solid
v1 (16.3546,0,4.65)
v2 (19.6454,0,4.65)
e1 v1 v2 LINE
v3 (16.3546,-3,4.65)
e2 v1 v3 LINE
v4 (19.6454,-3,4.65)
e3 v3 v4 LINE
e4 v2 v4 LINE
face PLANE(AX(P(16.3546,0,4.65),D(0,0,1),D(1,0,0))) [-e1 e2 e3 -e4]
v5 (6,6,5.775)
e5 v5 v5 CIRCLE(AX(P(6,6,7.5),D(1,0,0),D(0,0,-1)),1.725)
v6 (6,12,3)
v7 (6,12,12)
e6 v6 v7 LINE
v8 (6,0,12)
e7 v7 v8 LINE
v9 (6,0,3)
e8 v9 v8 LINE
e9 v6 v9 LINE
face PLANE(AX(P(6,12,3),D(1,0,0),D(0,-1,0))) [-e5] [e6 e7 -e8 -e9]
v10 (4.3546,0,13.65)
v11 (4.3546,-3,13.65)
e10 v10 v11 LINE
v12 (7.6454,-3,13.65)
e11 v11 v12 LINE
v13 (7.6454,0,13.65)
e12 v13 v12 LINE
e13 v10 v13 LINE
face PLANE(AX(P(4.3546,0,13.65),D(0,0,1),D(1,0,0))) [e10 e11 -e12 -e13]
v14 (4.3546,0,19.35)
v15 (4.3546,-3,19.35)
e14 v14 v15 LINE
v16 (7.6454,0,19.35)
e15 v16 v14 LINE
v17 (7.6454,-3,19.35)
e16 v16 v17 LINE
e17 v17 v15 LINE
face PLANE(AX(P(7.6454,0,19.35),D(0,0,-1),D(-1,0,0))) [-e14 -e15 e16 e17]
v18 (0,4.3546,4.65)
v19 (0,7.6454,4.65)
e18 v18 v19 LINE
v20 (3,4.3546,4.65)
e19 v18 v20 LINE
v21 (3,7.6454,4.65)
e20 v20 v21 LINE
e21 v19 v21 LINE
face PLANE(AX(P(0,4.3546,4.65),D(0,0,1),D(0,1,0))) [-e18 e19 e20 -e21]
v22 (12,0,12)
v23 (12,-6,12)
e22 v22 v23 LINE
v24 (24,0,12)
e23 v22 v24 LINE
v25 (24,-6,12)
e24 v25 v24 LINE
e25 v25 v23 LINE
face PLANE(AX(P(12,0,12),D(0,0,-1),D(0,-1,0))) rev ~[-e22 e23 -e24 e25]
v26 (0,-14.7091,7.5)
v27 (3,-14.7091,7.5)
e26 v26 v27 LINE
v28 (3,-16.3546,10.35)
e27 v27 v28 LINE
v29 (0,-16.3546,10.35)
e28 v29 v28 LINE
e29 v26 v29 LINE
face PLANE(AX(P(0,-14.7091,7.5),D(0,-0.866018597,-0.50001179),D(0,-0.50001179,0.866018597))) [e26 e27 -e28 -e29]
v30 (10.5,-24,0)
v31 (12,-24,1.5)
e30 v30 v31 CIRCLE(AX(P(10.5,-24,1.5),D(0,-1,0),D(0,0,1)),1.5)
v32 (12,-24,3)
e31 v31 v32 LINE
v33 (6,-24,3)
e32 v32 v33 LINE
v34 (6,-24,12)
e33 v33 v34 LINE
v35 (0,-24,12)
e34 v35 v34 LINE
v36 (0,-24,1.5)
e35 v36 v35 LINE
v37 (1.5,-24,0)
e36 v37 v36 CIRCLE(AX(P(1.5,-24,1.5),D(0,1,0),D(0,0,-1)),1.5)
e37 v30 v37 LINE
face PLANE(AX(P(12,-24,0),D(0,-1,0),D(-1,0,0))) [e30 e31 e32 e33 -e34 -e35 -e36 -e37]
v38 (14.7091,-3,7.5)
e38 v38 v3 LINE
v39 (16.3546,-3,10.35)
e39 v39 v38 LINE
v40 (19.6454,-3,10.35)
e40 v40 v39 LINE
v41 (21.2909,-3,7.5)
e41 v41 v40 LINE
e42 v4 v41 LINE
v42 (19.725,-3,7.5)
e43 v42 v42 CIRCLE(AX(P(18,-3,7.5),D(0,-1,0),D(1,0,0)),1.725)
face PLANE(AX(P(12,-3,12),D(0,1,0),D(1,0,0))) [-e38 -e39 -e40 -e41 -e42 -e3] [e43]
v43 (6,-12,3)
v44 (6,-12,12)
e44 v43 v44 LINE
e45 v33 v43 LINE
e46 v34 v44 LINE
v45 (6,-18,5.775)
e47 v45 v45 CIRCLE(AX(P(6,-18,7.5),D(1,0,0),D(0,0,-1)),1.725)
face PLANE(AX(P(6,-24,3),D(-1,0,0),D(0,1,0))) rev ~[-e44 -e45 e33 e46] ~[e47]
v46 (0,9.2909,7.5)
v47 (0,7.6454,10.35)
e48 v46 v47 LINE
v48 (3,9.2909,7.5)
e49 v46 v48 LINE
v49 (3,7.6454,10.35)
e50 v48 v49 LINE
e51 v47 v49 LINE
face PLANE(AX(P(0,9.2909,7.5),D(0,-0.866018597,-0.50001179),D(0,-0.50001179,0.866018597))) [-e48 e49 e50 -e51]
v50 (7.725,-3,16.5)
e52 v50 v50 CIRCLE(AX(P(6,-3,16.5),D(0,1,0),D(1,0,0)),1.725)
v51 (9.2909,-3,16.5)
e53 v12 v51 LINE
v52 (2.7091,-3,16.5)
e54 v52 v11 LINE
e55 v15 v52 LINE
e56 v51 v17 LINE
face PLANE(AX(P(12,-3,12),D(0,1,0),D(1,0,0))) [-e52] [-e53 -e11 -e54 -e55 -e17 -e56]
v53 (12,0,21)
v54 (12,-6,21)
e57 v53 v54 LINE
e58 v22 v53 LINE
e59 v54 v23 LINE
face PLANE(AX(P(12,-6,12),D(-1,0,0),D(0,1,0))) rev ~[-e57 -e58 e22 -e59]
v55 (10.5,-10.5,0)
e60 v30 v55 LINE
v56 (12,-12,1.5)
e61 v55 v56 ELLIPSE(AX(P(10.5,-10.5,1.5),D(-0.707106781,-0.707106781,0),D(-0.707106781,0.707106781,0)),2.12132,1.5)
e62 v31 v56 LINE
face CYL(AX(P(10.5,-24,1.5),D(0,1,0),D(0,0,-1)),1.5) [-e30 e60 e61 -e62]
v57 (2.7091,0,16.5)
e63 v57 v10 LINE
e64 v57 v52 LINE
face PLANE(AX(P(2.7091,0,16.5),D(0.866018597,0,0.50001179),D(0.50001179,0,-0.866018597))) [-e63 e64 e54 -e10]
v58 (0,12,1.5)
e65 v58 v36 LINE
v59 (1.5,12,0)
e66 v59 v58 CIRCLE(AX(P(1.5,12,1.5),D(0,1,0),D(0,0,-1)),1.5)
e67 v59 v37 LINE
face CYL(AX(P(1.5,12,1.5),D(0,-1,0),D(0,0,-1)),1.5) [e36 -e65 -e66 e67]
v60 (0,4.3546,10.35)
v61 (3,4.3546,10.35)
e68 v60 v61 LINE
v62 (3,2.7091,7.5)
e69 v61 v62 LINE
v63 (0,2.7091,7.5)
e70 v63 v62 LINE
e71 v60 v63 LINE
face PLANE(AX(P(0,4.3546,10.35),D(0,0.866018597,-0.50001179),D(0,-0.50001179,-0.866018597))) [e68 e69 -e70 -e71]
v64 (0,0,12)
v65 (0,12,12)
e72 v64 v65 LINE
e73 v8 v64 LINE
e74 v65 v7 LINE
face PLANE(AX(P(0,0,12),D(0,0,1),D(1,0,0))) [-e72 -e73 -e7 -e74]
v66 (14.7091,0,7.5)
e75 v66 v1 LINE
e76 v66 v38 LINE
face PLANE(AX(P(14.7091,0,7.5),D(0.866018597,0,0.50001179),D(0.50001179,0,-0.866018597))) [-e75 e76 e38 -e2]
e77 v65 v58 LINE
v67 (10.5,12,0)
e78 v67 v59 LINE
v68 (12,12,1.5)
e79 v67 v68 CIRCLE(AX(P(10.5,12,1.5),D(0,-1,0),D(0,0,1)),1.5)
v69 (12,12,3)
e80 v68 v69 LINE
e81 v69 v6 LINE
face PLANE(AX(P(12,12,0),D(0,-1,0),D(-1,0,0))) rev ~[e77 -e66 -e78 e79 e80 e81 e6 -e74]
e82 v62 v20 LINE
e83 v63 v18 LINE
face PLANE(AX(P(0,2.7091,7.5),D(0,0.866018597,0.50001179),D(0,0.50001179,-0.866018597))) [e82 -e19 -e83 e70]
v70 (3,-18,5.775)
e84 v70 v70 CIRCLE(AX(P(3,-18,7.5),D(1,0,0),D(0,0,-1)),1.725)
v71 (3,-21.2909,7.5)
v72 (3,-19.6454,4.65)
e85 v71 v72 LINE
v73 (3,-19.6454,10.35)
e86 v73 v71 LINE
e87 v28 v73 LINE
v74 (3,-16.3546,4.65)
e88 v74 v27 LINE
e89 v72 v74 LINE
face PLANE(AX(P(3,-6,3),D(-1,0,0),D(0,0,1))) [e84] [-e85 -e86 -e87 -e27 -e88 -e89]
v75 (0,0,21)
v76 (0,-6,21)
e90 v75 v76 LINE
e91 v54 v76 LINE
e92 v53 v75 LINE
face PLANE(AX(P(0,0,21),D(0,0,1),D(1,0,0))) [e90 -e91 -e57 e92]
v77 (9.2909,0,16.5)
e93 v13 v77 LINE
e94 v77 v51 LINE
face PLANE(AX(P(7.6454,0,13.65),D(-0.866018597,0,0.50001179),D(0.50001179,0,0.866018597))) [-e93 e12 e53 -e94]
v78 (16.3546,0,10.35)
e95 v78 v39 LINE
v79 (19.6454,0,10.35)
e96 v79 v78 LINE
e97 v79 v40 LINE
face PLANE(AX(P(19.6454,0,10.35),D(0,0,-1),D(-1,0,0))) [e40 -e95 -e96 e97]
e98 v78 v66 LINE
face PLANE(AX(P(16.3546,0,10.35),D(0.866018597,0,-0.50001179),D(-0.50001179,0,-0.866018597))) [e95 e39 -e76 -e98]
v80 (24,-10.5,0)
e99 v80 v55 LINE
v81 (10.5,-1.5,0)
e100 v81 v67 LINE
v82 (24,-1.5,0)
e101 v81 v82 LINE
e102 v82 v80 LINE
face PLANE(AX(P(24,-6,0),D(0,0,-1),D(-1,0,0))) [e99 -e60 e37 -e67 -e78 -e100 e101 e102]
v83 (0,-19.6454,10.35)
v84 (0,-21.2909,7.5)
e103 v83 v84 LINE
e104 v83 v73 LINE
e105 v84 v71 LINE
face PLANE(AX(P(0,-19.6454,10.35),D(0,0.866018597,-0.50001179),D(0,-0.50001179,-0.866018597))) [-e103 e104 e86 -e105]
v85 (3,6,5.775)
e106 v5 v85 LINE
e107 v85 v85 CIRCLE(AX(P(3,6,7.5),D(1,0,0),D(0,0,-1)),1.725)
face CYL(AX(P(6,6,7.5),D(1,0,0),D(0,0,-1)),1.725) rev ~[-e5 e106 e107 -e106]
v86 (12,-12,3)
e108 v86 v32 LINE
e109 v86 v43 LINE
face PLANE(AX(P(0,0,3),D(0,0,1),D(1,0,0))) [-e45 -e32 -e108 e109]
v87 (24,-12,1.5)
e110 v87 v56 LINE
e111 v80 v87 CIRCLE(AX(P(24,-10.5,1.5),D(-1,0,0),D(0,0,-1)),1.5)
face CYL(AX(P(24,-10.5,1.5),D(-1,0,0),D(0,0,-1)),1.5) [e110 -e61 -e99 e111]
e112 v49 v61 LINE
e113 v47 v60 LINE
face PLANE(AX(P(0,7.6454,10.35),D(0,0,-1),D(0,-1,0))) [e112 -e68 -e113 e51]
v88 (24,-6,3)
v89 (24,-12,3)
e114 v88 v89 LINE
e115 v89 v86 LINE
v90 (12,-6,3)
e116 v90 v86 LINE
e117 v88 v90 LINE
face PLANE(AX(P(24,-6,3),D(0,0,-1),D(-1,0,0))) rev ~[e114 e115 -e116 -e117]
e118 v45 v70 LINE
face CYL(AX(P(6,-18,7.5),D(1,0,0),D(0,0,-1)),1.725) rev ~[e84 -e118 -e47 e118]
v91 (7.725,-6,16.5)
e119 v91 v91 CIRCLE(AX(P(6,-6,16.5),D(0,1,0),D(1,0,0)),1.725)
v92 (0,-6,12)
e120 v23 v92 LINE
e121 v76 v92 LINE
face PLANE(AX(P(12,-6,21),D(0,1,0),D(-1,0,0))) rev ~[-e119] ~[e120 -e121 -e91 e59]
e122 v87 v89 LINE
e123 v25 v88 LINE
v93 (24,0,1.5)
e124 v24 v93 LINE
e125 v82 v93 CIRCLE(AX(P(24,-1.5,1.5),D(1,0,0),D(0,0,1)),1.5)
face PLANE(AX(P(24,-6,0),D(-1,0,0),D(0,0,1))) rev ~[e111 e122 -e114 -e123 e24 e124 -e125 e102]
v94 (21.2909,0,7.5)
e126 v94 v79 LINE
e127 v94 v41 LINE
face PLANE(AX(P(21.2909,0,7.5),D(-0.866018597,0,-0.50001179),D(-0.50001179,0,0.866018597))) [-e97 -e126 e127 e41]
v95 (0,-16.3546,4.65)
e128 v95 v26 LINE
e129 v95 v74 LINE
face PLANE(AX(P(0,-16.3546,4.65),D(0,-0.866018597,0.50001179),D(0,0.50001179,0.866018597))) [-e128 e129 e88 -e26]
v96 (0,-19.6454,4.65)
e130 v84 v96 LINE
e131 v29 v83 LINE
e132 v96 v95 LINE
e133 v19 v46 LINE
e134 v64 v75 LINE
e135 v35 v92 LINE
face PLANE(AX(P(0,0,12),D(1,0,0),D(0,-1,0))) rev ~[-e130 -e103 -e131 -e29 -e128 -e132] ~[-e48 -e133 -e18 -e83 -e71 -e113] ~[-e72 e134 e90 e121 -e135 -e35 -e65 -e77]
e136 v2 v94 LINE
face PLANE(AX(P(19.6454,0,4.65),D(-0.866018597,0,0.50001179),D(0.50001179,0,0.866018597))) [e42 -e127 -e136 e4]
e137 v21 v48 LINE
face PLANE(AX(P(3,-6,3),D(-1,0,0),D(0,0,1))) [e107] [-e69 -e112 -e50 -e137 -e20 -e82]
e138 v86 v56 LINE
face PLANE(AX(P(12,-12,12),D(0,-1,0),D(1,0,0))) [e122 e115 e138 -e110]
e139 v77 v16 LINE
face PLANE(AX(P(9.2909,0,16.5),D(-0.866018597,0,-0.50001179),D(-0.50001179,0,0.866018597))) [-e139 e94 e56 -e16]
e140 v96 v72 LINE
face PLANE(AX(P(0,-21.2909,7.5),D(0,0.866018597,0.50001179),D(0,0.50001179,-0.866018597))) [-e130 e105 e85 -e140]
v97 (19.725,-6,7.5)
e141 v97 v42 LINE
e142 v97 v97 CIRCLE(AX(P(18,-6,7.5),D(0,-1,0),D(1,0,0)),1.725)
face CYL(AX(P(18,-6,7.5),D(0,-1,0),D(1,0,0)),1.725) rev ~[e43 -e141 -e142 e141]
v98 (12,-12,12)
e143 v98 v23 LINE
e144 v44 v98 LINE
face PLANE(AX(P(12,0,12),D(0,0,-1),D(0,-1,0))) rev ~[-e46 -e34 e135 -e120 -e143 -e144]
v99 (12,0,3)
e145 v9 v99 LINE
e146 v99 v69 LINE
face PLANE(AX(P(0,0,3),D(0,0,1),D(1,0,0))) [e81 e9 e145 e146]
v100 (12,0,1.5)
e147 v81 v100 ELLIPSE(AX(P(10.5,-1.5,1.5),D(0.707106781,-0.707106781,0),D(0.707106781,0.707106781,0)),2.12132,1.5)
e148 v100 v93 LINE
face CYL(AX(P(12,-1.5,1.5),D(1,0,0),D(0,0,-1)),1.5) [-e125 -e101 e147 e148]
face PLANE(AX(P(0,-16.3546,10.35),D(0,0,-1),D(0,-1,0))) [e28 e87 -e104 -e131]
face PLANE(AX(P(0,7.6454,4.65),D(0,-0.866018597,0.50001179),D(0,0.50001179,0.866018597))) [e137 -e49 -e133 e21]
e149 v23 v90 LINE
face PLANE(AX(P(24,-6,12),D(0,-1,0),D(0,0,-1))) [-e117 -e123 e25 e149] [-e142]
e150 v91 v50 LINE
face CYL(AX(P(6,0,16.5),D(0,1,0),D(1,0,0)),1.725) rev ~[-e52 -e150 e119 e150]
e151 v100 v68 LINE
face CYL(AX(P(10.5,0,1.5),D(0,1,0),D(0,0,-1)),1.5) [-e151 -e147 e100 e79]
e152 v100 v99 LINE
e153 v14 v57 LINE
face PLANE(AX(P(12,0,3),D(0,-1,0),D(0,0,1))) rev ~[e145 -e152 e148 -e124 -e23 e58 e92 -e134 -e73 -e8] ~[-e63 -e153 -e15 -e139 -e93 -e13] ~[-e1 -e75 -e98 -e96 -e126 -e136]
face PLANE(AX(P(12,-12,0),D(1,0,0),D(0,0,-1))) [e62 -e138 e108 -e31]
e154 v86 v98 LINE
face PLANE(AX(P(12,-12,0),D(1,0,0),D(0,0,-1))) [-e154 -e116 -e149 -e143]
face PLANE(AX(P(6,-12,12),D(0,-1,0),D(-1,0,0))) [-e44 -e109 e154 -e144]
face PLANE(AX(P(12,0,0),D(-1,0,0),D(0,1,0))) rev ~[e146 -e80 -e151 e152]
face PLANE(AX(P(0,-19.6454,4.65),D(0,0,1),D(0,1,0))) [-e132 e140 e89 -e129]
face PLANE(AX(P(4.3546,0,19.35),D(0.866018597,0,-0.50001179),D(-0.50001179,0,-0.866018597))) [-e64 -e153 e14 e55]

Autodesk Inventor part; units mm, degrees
ref_plane "YZ Plane" through (0, 0, 0) normal (1, 0, 0) x (0, 1, 0)
ref_plane "XZ Plane" through (0, 0, 0) normal (0, 1, 0) x (-1, 0, 0)
ref_plane "XY Plane" through (0, 0, 0) normal (0, 0, 1) x (1, 0, 0)
sketch "Sketch1" plane through (0, 0, 0) normal (0, 0, 1) x (1, 0, 0)
  line L0 (0, 0) -> (12, 0)
  line L1 (12, 0) -> (12, 12)
  line L2 (12, 12) -> (0, 12)
  line L3 (0, 12) -> (0, 0)
  line L4 (12, 0) -> (0, 0)
  line L5 (0, 0) -> (0, -12)
  line L6 (0, -12) -> (12, -12)
  line L7 (12, -12) -> (12, 0)
  line L8 (12, 0) -> (24, 0)
  line L9 (24, 0) -> (24, -12)
  line L10 (24, -12) -> (12, -12)
  line L11 (12, -12) -> (12, 0)
  line L12 (0, -12) -> (-12, -12)
  line L13 (-12, -12) -> (-12, 0)
  line L14 (-12, 0) -> (0, 0)
  line L15 (0, 0) -> (0, -12)
  line L16 (0, -12) -> (12, -12)
  line L17 (12, -12) -> (12, -24)
  line L18 (12, -24) -> (0, -24)
  line L19 (0, -24) -> (0, -12)
  dimension "d0" = 12
  dimension "d1" = 12
  dimension "d2" = 12
  dimension "d3" = 12
  dimension "d4" = 12
  dimension "d5" = 12
  dimension "d6" = 12
  dimension "d7" = 12
  dimension "d8" = 12
  dimension "d9" = 12
extrude "Extrusion1" add sketch "Sketch1" along normal blind 3
sketch "Sketch2" plane through (0, 0, 3) normal (0, 0, 1) x (1, 0, 0)
  line L0 (-12, 0) -> (-12, -12) projected
  line L1 (-12, -12) -> (-12, -6)
  line L2 (-12, -6) -> (0, -6)
  line L3 (-12, -12) -> (0, -12) projected
  line L4 (0, -6) -> (0, -12)
  line L5 (0, -12) -> (-12, -12)
  line L6 (12, -24) -> (12, -12) projected
  line L7 (12, -12) -> (12, -6)
  line L8 (12, -6) -> (24, -6)
  line L9 (24, -12) -> (24, 0) projected
  line L10 (12, -12) -> (24, -12) projected
  line L11 (24, -6) -> (24, -12)
  line L12 (24, -12) -> (12, -12)
  line L13 (0, 0) -> (0, -6)
  line L14 (12, 0) -> (12, 12) projected
  line L15 (0, 0) -> (12, 0)
  line L16 (12, 0) -> (12, -6)
  line L17 (12, -12) -> (0, -12)
  line L18 (0, 12) -> (0, 0) projected
  line L19 (0, 0) -> (0, 12)
  line L20 (0, 12) -> (6, 12)
  line L21 (12, 12) -> (0, 12) projected
  line L22 (6, 12) -> (6, 0)
  line L23 (6, 0) -> (0, 0)
  line L24 (0, -12) -> (0, -24) projected
  line L25 (0, -12) -> (0, -24)
  line L26 (0, -24) -> (6, -24)
  line L27 (0, -24) -> (12, -24) projected
  line L28 (6, -24) -> (6, -12)
  line L29 (6, -12) -> (0, -12)
  dimension "d12" = 6
  dimension "d13" = 12
extrude "Extrusion2" add sketch "Sketch2" along normal blind 9 contours L2 L4 L3 L0 | L13 L15 L16 L7 L17 L4 | L17 L28 L26 L24 | L18 L20 L22 L15 | L7 L8 L9 L10
sketch "Sketch3" plane through (0, 0, 12) normal (0, 0, 1) x (1, 0, 0)
  line L0 (0, -6) -> (12, -6)
  line L1 (12, -12) -> (6, -12) projected
  line L2 (12, -6) -> (12, -12)
  line L3 (0, -12) -> (0, -24) projected
  line L4 (12, -12) -> (0, -12)
  line L5 (0, -12) -> (0, -6)
  point P0 (0, 0)
extrude "Extrusion3" add sketch "Sketch3" along normal blind 9
sketch "Sketch4" plane through (6, -12, 3) normal (0, -1, 0) x (1, 0, 0)
  point P0 (-6, -3)
sketch "Sketch5" plane through (-12, -6, 3) normal (0, 1, 0) x (1, 0, 0)
  circle A0 centre (6, -4.5) radius 1.725
  line L0 (0, 0) -> (0, -9) projected
  line L1 (12, -9) -> (0, -9) projected
  circle A1 centre (18, -13.5) radius 1.725
  line L2 (24, -18) -> (12, -18) projected
  line L3 (24, -9) -> (24, -18) projected
  circle A2 centre (30, -4.5) radius 1.725
  line L4 (36, 0) -> (36, -9) projected
  line L5 (36, -9) -> (24, -9) projected
  point P0 (12, 3)
  dimension "d19" = 3.45
  dimension "d20" = 6
  dimension "d21" = 4.5
  dimension "d22" = 3.45
  dimension "d23" = 4.5
  dimension "d24" = 6
  dimension "d25" = 3.45
  dimension "d26" = 6
  dimension "d27" = 4.5
extrude "Extrusion4" cut sketch "Sketch5" against normal blind 3
sketch "Sketch6" plane through (6, -12, 3) normal (0, -1, 0) x (1, 0, 0)
  circle A0 centre (-12, 4.5) radius 1.725 projected
  line L0 (-10.3546, 7.35) -> (-8.7091, 4.5)
  line L1 (-8.7091, 4.5) -> (-10.3546, 1.65)
  line L2 (-10.3546, 1.65) -> (-13.6454, 1.65)
  line L3 (-13.6454, 1.65) -> (-15.2909, 4.5)
  line L4 (-15.2909, 4.5) -> (-13.6454, 7.35)
  line L5 (-13.6454, 7.35) -> (-10.3546, 7.35)
  circle A1 centre (12, 4.5) radius 1.725 projected
  line L6 (13.6454, 7.35) -> (15.2909, 4.5)
  line L7 (15.2909, 4.5) -> (13.6454, 1.65)
  line L8 (13.6454, 1.65) -> (10.3546, 1.65)
  line L9 (10.3546, 1.65) -> (8.7091, 4.5)
  line L10 (8.7091, 4.5) -> (10.3546, 7.35)
  line L11 (10.3546, 7.35) -> (13.6454, 7.35)
  circle A2 centre (0, 13.5) radius 1.725 projected
  line L12 (1.6454, 16.35) -> (3.2909, 13.5)
  line L13 (3.2909, 13.5) -> (1.6454, 10.65)
  line L14 (1.6454, 10.65) -> (-1.6454, 10.65)
  line L15 (-1.6454, 10.65) -> (-3.2909, 13.5)
  line L16 (-3.2909, 13.5) -> (-1.6454, 16.35)
  line L17 (-1.6454, 16.35) -> (1.6454, 16.35)
  point P0 (-6, -3)
  dimension "d30" = 2.85
  dimension "d31" = 2.85
  dimension "d32" = 2.85
extrude "Extrusion5" cut sketch "Sketch6" against normal blind 3 contours A0 | L0 L1 L2 L3 L4 L5 | A1 | L6 L7 L8 L9 L10 L11 | A2 | L12 L13 L14 L15 L16 L17
sketch "Sketch7" plane through (6, 0, 3) normal (1, 0, 0) x (0, 0, -1)
  circle A0 centre (-4.5, 6) radius 1.725
  circle A1 centre (-4.5, -18) radius 1.725
  line L0 (-9, 0) -> (-9, 12) projected
  line L1 (-9, -24) -> (-9, -12) projected
  line L2 (0, -24) -> (-9, -24) projected
  line L3 (0, 12) -> (-9, 12) projected
  point P0 (3, 0)
  dimension "d35" = 3.45
  dimension "d36" = 3.45
  dimension "d37" = 4.5
  dimension "d38" = 4.5
  dimension "d39" = 6
  dimension "d40" = 6
extrude "Extrusion6" cut sketch "Sketch7" against normal blind 3
sketch "Sketch8" plane through (0, -6, 3) normal (-1, 0, 0) x (0, 0, 1)
  circle A0 centre (4.5, 12) radius 1.725 projected
  line L0 (1.65, 13.6454) -> (4.5, 15.2909)
  line L1 (4.5, 15.2909) -> (7.35, 13.6454)
  line L2 (7.35, 13.6454) -> (7.35, 10.3546)
  line L3 (7.35, 10.3546) -> (4.5, 8.7091)
  line L4 (4.5, 8.7091) -> (1.65, 10.3546)
  line L5 (1.65, 10.3546) -> (1.65, 13.6454)
  circle A1 centre (4.5, -12) radius 1.725 projected
  line L6 (1.65, -10.3546) -> (4.5, -8.7091)
  line L7 (4.5, -8.7091) -> (7.35, -10.3546)
  line L8 (7.35, -10.3546) -> (7.35, -13.6454)
  line L9 (7.35, -13.6454) -> (4.5, -15.2909)
  line L10 (4.5, -15.2909) -> (1.65, -13.6454)
  line L11 (1.65, -13.6454) -> (1.65, -10.3546)
  point P0 (-3, 6)
  dimension "d43" = 2.85
  dimension "d44" = 2.85
extrude "Extrusion7" cut sketch "Sketch8" against normal blind 3 contours A0 | L0 L1 L2 L3 L4 L5 | A1 | L6 L7 L8 L9 L10 L11
sketch "Sketch9" plane through (0, 0, 12) normal (0, 0, 1) x (1, 0, 0)
  line L0 (12, 0) -> (12, 12) projected
  line L1 (0, -6) -> (-12, -6) projected
  line L2 (12, 0) -> (0, 0)
  line L3 (0, 0) -> (0, -6)
  line L4 (0, -6) -> (12, -6)
  line L5 (12, -6) -> (12, 0)
extrude "Extrusion8" add sketch "Sketch9" along normal blind 9
sketch "Sketch10" plane through (0, 0, 21) normal (0, 0, 1) x (1, 0, 0)
  line L0 (24, -6) -> (12, -6) projected
  line L1 (12, -6) -> (0, -6)
  line L2 (0, -6) -> (0, -12)
  line L3 (0, -12) -> (12, -12)
  line L4 (12, -12) -> (12, -6)
  point P0 (0, 0)
sketch "Sketch11" plane through (6, 0, 3) normal (0, 1, 0) x (1, 0, 0)
  circle A0 centre (0, -13.5) radius 1.725 projected
  circle A1 centre (0, -13.5) radius 1.725
  point P0 (-6, 3)
extrude "Extrusion9" cut sketch "Sketch11" against normal through all
extrude "Extrusion10" cut sketch "Sketch10" against normal blind 9
sketch "Sketch12" plane through (0, 0, 0) normal (0, 0, -1) x (-1, 0, 0)
  line L0 (12, -12) -> (0, -12) projected
  line L1 (12, -12) -> (0, -12)
  line L2 (0, -12) -> (0, 0)
  line L3 (0, 0) -> (12, 0)
  line L4 (12, 0) -> (12, -12)
extrude "Extrusion11" cut sketch "Sketch12" against normal through all
sketch "Sketch13" plane through (12, -6, 3) normal (1, 0, 0) x (0, 0, -1)
  line L0 (-9, 0) -> (-18, 0) projected
  line L1 (-9, 0) -> (0, 0)
  line L2 (0, 0) -> (0, 6)
  line L3 (0, 6) -> (-9, 6)
  line L4 (-9, 6) -> (-9, 0)
  point P0 (3, 6)
extrude "Extrusion12" add sketch "Sketch13" along normal blind 12
sketch "Sketch15" plane through (24, -12, 0) normal (1, 0, 0) x (0, 0, -1)
  line L0 (-12, 6) -> (-12, 12) projected
  line L1 (0, 0) -> (-12, 0)
  line L2 (-12, 0) -> (-12, 6)
  line L3 (-12, 6) -> (0, 6)
  line L4 (0, 6) -> (0, 0)
  point P0 (0, 12)
extrude "Extrusion14" cut sketch "Sketch15" against normal blind 12
sketch "Sketch16" plane through (12, -6, 12) normal (0, -1, 0) x (1, 0, 0)
  circle A0 centre (6, -4.5) radius 1.725 projected
  circle A1 centre (6, -4.5) radius 1.725
  point P0 (-12, -12)
extrude "Extrusion15" [suppressed]
sketch "Sketch17" plane through (12, -6, 12) normal (0, -1, 0) x (1, 0, 0)
  line L0 (12, -12) -> (0, -12) projected
  line L1 (0, -12) -> (12, -12)
  line L2 (12, -12) -> (12, -9)
  line L3 (12, -9) -> (0, -9)
  line L4 (0, -9) -> (0, -12)
  point P0 (-12, -12)
  dimension "d64" = 12
  dimension "d65" = 3
extrude "Extrusion16" add sketch "Sketch17" along normal blind 6
fillet "Fillet2" radius 1.5 5 edges at (18, -12, 0) (12, -18, 0) (18, 0, 0) (12, 6, 0) (0, -6, 0)
sketch "Sketch18" plane through (12, -6, 12) normal (0, -1, 0) x (1, 0, 0)
  circle A0 centre (6, -4.5) radius 1.725 projected
  circle A1 centre (6, -4.5) radius 1.725
  point P0 (-12, -12)
extrude "Extrusion17" cut sketch "Sketch18" against normal blind 3
sketch "Sketch19" plane through (12, 0, 12) normal (0, 1, 0) x (1, 0, 0)
  point P0 (-12, 12)
sketch "Sketch20" plane through (12, 0, 12) normal (0, 1, 0) x (1, 0, 0)
  circle A0 centre (6, 4.5) radius 1.725 projected
  line L0 (4.3546, 1.65) -> (2.7091, 4.5)
  line L1 (2.7091, 4.5) -> (4.3546, 7.35)
  line L2 (4.3546, 7.35) -> (7.6454, 7.35)
  line L3 (7.6454, 7.35) -> (9.2909, 4.5)
  line L4 (9.2909, 4.5) -> (7.6454, 1.65)
  line L5 (7.6454, 1.65) -> (4.3546, 1.65)
  point P0 (-12, 12)
  dimension "d71" = 5.7
extrude "Extrusion18" cut sketch "Sketch20" against normal blind 3 contours A0 | L0 L1 L2 L3 L4 L5
sketch "Sketch21" plane through (12, 0, 12) normal (0, 1, 0) x (1, 0, 0)
  circle A0 centre (-6, -4.5) radius 1.725 projected
  line L0 (-7.6454, -7.35) -> (-9.2909, -4.5)
  line L1 (-9.2909, -4.5) -> (-7.6454, -1.65)
  line L2 (-7.6454, -1.65) -> (-4.3546, -1.65)
  line L3 (-4.3546, -1.65) -> (-2.7091, -4.5)
  line L4 (-2.7091, -4.5) -> (-4.3546, -7.35)
  line L5 (-4.3546, -7.35) -> (-7.6454, -7.35)
  point P0 (-12, 12)
  dimension "d74" = 5.7
extrude "Extrusion19" cut sketch "Sketch21" against normal blind 3
properties part number "threewayNES"
